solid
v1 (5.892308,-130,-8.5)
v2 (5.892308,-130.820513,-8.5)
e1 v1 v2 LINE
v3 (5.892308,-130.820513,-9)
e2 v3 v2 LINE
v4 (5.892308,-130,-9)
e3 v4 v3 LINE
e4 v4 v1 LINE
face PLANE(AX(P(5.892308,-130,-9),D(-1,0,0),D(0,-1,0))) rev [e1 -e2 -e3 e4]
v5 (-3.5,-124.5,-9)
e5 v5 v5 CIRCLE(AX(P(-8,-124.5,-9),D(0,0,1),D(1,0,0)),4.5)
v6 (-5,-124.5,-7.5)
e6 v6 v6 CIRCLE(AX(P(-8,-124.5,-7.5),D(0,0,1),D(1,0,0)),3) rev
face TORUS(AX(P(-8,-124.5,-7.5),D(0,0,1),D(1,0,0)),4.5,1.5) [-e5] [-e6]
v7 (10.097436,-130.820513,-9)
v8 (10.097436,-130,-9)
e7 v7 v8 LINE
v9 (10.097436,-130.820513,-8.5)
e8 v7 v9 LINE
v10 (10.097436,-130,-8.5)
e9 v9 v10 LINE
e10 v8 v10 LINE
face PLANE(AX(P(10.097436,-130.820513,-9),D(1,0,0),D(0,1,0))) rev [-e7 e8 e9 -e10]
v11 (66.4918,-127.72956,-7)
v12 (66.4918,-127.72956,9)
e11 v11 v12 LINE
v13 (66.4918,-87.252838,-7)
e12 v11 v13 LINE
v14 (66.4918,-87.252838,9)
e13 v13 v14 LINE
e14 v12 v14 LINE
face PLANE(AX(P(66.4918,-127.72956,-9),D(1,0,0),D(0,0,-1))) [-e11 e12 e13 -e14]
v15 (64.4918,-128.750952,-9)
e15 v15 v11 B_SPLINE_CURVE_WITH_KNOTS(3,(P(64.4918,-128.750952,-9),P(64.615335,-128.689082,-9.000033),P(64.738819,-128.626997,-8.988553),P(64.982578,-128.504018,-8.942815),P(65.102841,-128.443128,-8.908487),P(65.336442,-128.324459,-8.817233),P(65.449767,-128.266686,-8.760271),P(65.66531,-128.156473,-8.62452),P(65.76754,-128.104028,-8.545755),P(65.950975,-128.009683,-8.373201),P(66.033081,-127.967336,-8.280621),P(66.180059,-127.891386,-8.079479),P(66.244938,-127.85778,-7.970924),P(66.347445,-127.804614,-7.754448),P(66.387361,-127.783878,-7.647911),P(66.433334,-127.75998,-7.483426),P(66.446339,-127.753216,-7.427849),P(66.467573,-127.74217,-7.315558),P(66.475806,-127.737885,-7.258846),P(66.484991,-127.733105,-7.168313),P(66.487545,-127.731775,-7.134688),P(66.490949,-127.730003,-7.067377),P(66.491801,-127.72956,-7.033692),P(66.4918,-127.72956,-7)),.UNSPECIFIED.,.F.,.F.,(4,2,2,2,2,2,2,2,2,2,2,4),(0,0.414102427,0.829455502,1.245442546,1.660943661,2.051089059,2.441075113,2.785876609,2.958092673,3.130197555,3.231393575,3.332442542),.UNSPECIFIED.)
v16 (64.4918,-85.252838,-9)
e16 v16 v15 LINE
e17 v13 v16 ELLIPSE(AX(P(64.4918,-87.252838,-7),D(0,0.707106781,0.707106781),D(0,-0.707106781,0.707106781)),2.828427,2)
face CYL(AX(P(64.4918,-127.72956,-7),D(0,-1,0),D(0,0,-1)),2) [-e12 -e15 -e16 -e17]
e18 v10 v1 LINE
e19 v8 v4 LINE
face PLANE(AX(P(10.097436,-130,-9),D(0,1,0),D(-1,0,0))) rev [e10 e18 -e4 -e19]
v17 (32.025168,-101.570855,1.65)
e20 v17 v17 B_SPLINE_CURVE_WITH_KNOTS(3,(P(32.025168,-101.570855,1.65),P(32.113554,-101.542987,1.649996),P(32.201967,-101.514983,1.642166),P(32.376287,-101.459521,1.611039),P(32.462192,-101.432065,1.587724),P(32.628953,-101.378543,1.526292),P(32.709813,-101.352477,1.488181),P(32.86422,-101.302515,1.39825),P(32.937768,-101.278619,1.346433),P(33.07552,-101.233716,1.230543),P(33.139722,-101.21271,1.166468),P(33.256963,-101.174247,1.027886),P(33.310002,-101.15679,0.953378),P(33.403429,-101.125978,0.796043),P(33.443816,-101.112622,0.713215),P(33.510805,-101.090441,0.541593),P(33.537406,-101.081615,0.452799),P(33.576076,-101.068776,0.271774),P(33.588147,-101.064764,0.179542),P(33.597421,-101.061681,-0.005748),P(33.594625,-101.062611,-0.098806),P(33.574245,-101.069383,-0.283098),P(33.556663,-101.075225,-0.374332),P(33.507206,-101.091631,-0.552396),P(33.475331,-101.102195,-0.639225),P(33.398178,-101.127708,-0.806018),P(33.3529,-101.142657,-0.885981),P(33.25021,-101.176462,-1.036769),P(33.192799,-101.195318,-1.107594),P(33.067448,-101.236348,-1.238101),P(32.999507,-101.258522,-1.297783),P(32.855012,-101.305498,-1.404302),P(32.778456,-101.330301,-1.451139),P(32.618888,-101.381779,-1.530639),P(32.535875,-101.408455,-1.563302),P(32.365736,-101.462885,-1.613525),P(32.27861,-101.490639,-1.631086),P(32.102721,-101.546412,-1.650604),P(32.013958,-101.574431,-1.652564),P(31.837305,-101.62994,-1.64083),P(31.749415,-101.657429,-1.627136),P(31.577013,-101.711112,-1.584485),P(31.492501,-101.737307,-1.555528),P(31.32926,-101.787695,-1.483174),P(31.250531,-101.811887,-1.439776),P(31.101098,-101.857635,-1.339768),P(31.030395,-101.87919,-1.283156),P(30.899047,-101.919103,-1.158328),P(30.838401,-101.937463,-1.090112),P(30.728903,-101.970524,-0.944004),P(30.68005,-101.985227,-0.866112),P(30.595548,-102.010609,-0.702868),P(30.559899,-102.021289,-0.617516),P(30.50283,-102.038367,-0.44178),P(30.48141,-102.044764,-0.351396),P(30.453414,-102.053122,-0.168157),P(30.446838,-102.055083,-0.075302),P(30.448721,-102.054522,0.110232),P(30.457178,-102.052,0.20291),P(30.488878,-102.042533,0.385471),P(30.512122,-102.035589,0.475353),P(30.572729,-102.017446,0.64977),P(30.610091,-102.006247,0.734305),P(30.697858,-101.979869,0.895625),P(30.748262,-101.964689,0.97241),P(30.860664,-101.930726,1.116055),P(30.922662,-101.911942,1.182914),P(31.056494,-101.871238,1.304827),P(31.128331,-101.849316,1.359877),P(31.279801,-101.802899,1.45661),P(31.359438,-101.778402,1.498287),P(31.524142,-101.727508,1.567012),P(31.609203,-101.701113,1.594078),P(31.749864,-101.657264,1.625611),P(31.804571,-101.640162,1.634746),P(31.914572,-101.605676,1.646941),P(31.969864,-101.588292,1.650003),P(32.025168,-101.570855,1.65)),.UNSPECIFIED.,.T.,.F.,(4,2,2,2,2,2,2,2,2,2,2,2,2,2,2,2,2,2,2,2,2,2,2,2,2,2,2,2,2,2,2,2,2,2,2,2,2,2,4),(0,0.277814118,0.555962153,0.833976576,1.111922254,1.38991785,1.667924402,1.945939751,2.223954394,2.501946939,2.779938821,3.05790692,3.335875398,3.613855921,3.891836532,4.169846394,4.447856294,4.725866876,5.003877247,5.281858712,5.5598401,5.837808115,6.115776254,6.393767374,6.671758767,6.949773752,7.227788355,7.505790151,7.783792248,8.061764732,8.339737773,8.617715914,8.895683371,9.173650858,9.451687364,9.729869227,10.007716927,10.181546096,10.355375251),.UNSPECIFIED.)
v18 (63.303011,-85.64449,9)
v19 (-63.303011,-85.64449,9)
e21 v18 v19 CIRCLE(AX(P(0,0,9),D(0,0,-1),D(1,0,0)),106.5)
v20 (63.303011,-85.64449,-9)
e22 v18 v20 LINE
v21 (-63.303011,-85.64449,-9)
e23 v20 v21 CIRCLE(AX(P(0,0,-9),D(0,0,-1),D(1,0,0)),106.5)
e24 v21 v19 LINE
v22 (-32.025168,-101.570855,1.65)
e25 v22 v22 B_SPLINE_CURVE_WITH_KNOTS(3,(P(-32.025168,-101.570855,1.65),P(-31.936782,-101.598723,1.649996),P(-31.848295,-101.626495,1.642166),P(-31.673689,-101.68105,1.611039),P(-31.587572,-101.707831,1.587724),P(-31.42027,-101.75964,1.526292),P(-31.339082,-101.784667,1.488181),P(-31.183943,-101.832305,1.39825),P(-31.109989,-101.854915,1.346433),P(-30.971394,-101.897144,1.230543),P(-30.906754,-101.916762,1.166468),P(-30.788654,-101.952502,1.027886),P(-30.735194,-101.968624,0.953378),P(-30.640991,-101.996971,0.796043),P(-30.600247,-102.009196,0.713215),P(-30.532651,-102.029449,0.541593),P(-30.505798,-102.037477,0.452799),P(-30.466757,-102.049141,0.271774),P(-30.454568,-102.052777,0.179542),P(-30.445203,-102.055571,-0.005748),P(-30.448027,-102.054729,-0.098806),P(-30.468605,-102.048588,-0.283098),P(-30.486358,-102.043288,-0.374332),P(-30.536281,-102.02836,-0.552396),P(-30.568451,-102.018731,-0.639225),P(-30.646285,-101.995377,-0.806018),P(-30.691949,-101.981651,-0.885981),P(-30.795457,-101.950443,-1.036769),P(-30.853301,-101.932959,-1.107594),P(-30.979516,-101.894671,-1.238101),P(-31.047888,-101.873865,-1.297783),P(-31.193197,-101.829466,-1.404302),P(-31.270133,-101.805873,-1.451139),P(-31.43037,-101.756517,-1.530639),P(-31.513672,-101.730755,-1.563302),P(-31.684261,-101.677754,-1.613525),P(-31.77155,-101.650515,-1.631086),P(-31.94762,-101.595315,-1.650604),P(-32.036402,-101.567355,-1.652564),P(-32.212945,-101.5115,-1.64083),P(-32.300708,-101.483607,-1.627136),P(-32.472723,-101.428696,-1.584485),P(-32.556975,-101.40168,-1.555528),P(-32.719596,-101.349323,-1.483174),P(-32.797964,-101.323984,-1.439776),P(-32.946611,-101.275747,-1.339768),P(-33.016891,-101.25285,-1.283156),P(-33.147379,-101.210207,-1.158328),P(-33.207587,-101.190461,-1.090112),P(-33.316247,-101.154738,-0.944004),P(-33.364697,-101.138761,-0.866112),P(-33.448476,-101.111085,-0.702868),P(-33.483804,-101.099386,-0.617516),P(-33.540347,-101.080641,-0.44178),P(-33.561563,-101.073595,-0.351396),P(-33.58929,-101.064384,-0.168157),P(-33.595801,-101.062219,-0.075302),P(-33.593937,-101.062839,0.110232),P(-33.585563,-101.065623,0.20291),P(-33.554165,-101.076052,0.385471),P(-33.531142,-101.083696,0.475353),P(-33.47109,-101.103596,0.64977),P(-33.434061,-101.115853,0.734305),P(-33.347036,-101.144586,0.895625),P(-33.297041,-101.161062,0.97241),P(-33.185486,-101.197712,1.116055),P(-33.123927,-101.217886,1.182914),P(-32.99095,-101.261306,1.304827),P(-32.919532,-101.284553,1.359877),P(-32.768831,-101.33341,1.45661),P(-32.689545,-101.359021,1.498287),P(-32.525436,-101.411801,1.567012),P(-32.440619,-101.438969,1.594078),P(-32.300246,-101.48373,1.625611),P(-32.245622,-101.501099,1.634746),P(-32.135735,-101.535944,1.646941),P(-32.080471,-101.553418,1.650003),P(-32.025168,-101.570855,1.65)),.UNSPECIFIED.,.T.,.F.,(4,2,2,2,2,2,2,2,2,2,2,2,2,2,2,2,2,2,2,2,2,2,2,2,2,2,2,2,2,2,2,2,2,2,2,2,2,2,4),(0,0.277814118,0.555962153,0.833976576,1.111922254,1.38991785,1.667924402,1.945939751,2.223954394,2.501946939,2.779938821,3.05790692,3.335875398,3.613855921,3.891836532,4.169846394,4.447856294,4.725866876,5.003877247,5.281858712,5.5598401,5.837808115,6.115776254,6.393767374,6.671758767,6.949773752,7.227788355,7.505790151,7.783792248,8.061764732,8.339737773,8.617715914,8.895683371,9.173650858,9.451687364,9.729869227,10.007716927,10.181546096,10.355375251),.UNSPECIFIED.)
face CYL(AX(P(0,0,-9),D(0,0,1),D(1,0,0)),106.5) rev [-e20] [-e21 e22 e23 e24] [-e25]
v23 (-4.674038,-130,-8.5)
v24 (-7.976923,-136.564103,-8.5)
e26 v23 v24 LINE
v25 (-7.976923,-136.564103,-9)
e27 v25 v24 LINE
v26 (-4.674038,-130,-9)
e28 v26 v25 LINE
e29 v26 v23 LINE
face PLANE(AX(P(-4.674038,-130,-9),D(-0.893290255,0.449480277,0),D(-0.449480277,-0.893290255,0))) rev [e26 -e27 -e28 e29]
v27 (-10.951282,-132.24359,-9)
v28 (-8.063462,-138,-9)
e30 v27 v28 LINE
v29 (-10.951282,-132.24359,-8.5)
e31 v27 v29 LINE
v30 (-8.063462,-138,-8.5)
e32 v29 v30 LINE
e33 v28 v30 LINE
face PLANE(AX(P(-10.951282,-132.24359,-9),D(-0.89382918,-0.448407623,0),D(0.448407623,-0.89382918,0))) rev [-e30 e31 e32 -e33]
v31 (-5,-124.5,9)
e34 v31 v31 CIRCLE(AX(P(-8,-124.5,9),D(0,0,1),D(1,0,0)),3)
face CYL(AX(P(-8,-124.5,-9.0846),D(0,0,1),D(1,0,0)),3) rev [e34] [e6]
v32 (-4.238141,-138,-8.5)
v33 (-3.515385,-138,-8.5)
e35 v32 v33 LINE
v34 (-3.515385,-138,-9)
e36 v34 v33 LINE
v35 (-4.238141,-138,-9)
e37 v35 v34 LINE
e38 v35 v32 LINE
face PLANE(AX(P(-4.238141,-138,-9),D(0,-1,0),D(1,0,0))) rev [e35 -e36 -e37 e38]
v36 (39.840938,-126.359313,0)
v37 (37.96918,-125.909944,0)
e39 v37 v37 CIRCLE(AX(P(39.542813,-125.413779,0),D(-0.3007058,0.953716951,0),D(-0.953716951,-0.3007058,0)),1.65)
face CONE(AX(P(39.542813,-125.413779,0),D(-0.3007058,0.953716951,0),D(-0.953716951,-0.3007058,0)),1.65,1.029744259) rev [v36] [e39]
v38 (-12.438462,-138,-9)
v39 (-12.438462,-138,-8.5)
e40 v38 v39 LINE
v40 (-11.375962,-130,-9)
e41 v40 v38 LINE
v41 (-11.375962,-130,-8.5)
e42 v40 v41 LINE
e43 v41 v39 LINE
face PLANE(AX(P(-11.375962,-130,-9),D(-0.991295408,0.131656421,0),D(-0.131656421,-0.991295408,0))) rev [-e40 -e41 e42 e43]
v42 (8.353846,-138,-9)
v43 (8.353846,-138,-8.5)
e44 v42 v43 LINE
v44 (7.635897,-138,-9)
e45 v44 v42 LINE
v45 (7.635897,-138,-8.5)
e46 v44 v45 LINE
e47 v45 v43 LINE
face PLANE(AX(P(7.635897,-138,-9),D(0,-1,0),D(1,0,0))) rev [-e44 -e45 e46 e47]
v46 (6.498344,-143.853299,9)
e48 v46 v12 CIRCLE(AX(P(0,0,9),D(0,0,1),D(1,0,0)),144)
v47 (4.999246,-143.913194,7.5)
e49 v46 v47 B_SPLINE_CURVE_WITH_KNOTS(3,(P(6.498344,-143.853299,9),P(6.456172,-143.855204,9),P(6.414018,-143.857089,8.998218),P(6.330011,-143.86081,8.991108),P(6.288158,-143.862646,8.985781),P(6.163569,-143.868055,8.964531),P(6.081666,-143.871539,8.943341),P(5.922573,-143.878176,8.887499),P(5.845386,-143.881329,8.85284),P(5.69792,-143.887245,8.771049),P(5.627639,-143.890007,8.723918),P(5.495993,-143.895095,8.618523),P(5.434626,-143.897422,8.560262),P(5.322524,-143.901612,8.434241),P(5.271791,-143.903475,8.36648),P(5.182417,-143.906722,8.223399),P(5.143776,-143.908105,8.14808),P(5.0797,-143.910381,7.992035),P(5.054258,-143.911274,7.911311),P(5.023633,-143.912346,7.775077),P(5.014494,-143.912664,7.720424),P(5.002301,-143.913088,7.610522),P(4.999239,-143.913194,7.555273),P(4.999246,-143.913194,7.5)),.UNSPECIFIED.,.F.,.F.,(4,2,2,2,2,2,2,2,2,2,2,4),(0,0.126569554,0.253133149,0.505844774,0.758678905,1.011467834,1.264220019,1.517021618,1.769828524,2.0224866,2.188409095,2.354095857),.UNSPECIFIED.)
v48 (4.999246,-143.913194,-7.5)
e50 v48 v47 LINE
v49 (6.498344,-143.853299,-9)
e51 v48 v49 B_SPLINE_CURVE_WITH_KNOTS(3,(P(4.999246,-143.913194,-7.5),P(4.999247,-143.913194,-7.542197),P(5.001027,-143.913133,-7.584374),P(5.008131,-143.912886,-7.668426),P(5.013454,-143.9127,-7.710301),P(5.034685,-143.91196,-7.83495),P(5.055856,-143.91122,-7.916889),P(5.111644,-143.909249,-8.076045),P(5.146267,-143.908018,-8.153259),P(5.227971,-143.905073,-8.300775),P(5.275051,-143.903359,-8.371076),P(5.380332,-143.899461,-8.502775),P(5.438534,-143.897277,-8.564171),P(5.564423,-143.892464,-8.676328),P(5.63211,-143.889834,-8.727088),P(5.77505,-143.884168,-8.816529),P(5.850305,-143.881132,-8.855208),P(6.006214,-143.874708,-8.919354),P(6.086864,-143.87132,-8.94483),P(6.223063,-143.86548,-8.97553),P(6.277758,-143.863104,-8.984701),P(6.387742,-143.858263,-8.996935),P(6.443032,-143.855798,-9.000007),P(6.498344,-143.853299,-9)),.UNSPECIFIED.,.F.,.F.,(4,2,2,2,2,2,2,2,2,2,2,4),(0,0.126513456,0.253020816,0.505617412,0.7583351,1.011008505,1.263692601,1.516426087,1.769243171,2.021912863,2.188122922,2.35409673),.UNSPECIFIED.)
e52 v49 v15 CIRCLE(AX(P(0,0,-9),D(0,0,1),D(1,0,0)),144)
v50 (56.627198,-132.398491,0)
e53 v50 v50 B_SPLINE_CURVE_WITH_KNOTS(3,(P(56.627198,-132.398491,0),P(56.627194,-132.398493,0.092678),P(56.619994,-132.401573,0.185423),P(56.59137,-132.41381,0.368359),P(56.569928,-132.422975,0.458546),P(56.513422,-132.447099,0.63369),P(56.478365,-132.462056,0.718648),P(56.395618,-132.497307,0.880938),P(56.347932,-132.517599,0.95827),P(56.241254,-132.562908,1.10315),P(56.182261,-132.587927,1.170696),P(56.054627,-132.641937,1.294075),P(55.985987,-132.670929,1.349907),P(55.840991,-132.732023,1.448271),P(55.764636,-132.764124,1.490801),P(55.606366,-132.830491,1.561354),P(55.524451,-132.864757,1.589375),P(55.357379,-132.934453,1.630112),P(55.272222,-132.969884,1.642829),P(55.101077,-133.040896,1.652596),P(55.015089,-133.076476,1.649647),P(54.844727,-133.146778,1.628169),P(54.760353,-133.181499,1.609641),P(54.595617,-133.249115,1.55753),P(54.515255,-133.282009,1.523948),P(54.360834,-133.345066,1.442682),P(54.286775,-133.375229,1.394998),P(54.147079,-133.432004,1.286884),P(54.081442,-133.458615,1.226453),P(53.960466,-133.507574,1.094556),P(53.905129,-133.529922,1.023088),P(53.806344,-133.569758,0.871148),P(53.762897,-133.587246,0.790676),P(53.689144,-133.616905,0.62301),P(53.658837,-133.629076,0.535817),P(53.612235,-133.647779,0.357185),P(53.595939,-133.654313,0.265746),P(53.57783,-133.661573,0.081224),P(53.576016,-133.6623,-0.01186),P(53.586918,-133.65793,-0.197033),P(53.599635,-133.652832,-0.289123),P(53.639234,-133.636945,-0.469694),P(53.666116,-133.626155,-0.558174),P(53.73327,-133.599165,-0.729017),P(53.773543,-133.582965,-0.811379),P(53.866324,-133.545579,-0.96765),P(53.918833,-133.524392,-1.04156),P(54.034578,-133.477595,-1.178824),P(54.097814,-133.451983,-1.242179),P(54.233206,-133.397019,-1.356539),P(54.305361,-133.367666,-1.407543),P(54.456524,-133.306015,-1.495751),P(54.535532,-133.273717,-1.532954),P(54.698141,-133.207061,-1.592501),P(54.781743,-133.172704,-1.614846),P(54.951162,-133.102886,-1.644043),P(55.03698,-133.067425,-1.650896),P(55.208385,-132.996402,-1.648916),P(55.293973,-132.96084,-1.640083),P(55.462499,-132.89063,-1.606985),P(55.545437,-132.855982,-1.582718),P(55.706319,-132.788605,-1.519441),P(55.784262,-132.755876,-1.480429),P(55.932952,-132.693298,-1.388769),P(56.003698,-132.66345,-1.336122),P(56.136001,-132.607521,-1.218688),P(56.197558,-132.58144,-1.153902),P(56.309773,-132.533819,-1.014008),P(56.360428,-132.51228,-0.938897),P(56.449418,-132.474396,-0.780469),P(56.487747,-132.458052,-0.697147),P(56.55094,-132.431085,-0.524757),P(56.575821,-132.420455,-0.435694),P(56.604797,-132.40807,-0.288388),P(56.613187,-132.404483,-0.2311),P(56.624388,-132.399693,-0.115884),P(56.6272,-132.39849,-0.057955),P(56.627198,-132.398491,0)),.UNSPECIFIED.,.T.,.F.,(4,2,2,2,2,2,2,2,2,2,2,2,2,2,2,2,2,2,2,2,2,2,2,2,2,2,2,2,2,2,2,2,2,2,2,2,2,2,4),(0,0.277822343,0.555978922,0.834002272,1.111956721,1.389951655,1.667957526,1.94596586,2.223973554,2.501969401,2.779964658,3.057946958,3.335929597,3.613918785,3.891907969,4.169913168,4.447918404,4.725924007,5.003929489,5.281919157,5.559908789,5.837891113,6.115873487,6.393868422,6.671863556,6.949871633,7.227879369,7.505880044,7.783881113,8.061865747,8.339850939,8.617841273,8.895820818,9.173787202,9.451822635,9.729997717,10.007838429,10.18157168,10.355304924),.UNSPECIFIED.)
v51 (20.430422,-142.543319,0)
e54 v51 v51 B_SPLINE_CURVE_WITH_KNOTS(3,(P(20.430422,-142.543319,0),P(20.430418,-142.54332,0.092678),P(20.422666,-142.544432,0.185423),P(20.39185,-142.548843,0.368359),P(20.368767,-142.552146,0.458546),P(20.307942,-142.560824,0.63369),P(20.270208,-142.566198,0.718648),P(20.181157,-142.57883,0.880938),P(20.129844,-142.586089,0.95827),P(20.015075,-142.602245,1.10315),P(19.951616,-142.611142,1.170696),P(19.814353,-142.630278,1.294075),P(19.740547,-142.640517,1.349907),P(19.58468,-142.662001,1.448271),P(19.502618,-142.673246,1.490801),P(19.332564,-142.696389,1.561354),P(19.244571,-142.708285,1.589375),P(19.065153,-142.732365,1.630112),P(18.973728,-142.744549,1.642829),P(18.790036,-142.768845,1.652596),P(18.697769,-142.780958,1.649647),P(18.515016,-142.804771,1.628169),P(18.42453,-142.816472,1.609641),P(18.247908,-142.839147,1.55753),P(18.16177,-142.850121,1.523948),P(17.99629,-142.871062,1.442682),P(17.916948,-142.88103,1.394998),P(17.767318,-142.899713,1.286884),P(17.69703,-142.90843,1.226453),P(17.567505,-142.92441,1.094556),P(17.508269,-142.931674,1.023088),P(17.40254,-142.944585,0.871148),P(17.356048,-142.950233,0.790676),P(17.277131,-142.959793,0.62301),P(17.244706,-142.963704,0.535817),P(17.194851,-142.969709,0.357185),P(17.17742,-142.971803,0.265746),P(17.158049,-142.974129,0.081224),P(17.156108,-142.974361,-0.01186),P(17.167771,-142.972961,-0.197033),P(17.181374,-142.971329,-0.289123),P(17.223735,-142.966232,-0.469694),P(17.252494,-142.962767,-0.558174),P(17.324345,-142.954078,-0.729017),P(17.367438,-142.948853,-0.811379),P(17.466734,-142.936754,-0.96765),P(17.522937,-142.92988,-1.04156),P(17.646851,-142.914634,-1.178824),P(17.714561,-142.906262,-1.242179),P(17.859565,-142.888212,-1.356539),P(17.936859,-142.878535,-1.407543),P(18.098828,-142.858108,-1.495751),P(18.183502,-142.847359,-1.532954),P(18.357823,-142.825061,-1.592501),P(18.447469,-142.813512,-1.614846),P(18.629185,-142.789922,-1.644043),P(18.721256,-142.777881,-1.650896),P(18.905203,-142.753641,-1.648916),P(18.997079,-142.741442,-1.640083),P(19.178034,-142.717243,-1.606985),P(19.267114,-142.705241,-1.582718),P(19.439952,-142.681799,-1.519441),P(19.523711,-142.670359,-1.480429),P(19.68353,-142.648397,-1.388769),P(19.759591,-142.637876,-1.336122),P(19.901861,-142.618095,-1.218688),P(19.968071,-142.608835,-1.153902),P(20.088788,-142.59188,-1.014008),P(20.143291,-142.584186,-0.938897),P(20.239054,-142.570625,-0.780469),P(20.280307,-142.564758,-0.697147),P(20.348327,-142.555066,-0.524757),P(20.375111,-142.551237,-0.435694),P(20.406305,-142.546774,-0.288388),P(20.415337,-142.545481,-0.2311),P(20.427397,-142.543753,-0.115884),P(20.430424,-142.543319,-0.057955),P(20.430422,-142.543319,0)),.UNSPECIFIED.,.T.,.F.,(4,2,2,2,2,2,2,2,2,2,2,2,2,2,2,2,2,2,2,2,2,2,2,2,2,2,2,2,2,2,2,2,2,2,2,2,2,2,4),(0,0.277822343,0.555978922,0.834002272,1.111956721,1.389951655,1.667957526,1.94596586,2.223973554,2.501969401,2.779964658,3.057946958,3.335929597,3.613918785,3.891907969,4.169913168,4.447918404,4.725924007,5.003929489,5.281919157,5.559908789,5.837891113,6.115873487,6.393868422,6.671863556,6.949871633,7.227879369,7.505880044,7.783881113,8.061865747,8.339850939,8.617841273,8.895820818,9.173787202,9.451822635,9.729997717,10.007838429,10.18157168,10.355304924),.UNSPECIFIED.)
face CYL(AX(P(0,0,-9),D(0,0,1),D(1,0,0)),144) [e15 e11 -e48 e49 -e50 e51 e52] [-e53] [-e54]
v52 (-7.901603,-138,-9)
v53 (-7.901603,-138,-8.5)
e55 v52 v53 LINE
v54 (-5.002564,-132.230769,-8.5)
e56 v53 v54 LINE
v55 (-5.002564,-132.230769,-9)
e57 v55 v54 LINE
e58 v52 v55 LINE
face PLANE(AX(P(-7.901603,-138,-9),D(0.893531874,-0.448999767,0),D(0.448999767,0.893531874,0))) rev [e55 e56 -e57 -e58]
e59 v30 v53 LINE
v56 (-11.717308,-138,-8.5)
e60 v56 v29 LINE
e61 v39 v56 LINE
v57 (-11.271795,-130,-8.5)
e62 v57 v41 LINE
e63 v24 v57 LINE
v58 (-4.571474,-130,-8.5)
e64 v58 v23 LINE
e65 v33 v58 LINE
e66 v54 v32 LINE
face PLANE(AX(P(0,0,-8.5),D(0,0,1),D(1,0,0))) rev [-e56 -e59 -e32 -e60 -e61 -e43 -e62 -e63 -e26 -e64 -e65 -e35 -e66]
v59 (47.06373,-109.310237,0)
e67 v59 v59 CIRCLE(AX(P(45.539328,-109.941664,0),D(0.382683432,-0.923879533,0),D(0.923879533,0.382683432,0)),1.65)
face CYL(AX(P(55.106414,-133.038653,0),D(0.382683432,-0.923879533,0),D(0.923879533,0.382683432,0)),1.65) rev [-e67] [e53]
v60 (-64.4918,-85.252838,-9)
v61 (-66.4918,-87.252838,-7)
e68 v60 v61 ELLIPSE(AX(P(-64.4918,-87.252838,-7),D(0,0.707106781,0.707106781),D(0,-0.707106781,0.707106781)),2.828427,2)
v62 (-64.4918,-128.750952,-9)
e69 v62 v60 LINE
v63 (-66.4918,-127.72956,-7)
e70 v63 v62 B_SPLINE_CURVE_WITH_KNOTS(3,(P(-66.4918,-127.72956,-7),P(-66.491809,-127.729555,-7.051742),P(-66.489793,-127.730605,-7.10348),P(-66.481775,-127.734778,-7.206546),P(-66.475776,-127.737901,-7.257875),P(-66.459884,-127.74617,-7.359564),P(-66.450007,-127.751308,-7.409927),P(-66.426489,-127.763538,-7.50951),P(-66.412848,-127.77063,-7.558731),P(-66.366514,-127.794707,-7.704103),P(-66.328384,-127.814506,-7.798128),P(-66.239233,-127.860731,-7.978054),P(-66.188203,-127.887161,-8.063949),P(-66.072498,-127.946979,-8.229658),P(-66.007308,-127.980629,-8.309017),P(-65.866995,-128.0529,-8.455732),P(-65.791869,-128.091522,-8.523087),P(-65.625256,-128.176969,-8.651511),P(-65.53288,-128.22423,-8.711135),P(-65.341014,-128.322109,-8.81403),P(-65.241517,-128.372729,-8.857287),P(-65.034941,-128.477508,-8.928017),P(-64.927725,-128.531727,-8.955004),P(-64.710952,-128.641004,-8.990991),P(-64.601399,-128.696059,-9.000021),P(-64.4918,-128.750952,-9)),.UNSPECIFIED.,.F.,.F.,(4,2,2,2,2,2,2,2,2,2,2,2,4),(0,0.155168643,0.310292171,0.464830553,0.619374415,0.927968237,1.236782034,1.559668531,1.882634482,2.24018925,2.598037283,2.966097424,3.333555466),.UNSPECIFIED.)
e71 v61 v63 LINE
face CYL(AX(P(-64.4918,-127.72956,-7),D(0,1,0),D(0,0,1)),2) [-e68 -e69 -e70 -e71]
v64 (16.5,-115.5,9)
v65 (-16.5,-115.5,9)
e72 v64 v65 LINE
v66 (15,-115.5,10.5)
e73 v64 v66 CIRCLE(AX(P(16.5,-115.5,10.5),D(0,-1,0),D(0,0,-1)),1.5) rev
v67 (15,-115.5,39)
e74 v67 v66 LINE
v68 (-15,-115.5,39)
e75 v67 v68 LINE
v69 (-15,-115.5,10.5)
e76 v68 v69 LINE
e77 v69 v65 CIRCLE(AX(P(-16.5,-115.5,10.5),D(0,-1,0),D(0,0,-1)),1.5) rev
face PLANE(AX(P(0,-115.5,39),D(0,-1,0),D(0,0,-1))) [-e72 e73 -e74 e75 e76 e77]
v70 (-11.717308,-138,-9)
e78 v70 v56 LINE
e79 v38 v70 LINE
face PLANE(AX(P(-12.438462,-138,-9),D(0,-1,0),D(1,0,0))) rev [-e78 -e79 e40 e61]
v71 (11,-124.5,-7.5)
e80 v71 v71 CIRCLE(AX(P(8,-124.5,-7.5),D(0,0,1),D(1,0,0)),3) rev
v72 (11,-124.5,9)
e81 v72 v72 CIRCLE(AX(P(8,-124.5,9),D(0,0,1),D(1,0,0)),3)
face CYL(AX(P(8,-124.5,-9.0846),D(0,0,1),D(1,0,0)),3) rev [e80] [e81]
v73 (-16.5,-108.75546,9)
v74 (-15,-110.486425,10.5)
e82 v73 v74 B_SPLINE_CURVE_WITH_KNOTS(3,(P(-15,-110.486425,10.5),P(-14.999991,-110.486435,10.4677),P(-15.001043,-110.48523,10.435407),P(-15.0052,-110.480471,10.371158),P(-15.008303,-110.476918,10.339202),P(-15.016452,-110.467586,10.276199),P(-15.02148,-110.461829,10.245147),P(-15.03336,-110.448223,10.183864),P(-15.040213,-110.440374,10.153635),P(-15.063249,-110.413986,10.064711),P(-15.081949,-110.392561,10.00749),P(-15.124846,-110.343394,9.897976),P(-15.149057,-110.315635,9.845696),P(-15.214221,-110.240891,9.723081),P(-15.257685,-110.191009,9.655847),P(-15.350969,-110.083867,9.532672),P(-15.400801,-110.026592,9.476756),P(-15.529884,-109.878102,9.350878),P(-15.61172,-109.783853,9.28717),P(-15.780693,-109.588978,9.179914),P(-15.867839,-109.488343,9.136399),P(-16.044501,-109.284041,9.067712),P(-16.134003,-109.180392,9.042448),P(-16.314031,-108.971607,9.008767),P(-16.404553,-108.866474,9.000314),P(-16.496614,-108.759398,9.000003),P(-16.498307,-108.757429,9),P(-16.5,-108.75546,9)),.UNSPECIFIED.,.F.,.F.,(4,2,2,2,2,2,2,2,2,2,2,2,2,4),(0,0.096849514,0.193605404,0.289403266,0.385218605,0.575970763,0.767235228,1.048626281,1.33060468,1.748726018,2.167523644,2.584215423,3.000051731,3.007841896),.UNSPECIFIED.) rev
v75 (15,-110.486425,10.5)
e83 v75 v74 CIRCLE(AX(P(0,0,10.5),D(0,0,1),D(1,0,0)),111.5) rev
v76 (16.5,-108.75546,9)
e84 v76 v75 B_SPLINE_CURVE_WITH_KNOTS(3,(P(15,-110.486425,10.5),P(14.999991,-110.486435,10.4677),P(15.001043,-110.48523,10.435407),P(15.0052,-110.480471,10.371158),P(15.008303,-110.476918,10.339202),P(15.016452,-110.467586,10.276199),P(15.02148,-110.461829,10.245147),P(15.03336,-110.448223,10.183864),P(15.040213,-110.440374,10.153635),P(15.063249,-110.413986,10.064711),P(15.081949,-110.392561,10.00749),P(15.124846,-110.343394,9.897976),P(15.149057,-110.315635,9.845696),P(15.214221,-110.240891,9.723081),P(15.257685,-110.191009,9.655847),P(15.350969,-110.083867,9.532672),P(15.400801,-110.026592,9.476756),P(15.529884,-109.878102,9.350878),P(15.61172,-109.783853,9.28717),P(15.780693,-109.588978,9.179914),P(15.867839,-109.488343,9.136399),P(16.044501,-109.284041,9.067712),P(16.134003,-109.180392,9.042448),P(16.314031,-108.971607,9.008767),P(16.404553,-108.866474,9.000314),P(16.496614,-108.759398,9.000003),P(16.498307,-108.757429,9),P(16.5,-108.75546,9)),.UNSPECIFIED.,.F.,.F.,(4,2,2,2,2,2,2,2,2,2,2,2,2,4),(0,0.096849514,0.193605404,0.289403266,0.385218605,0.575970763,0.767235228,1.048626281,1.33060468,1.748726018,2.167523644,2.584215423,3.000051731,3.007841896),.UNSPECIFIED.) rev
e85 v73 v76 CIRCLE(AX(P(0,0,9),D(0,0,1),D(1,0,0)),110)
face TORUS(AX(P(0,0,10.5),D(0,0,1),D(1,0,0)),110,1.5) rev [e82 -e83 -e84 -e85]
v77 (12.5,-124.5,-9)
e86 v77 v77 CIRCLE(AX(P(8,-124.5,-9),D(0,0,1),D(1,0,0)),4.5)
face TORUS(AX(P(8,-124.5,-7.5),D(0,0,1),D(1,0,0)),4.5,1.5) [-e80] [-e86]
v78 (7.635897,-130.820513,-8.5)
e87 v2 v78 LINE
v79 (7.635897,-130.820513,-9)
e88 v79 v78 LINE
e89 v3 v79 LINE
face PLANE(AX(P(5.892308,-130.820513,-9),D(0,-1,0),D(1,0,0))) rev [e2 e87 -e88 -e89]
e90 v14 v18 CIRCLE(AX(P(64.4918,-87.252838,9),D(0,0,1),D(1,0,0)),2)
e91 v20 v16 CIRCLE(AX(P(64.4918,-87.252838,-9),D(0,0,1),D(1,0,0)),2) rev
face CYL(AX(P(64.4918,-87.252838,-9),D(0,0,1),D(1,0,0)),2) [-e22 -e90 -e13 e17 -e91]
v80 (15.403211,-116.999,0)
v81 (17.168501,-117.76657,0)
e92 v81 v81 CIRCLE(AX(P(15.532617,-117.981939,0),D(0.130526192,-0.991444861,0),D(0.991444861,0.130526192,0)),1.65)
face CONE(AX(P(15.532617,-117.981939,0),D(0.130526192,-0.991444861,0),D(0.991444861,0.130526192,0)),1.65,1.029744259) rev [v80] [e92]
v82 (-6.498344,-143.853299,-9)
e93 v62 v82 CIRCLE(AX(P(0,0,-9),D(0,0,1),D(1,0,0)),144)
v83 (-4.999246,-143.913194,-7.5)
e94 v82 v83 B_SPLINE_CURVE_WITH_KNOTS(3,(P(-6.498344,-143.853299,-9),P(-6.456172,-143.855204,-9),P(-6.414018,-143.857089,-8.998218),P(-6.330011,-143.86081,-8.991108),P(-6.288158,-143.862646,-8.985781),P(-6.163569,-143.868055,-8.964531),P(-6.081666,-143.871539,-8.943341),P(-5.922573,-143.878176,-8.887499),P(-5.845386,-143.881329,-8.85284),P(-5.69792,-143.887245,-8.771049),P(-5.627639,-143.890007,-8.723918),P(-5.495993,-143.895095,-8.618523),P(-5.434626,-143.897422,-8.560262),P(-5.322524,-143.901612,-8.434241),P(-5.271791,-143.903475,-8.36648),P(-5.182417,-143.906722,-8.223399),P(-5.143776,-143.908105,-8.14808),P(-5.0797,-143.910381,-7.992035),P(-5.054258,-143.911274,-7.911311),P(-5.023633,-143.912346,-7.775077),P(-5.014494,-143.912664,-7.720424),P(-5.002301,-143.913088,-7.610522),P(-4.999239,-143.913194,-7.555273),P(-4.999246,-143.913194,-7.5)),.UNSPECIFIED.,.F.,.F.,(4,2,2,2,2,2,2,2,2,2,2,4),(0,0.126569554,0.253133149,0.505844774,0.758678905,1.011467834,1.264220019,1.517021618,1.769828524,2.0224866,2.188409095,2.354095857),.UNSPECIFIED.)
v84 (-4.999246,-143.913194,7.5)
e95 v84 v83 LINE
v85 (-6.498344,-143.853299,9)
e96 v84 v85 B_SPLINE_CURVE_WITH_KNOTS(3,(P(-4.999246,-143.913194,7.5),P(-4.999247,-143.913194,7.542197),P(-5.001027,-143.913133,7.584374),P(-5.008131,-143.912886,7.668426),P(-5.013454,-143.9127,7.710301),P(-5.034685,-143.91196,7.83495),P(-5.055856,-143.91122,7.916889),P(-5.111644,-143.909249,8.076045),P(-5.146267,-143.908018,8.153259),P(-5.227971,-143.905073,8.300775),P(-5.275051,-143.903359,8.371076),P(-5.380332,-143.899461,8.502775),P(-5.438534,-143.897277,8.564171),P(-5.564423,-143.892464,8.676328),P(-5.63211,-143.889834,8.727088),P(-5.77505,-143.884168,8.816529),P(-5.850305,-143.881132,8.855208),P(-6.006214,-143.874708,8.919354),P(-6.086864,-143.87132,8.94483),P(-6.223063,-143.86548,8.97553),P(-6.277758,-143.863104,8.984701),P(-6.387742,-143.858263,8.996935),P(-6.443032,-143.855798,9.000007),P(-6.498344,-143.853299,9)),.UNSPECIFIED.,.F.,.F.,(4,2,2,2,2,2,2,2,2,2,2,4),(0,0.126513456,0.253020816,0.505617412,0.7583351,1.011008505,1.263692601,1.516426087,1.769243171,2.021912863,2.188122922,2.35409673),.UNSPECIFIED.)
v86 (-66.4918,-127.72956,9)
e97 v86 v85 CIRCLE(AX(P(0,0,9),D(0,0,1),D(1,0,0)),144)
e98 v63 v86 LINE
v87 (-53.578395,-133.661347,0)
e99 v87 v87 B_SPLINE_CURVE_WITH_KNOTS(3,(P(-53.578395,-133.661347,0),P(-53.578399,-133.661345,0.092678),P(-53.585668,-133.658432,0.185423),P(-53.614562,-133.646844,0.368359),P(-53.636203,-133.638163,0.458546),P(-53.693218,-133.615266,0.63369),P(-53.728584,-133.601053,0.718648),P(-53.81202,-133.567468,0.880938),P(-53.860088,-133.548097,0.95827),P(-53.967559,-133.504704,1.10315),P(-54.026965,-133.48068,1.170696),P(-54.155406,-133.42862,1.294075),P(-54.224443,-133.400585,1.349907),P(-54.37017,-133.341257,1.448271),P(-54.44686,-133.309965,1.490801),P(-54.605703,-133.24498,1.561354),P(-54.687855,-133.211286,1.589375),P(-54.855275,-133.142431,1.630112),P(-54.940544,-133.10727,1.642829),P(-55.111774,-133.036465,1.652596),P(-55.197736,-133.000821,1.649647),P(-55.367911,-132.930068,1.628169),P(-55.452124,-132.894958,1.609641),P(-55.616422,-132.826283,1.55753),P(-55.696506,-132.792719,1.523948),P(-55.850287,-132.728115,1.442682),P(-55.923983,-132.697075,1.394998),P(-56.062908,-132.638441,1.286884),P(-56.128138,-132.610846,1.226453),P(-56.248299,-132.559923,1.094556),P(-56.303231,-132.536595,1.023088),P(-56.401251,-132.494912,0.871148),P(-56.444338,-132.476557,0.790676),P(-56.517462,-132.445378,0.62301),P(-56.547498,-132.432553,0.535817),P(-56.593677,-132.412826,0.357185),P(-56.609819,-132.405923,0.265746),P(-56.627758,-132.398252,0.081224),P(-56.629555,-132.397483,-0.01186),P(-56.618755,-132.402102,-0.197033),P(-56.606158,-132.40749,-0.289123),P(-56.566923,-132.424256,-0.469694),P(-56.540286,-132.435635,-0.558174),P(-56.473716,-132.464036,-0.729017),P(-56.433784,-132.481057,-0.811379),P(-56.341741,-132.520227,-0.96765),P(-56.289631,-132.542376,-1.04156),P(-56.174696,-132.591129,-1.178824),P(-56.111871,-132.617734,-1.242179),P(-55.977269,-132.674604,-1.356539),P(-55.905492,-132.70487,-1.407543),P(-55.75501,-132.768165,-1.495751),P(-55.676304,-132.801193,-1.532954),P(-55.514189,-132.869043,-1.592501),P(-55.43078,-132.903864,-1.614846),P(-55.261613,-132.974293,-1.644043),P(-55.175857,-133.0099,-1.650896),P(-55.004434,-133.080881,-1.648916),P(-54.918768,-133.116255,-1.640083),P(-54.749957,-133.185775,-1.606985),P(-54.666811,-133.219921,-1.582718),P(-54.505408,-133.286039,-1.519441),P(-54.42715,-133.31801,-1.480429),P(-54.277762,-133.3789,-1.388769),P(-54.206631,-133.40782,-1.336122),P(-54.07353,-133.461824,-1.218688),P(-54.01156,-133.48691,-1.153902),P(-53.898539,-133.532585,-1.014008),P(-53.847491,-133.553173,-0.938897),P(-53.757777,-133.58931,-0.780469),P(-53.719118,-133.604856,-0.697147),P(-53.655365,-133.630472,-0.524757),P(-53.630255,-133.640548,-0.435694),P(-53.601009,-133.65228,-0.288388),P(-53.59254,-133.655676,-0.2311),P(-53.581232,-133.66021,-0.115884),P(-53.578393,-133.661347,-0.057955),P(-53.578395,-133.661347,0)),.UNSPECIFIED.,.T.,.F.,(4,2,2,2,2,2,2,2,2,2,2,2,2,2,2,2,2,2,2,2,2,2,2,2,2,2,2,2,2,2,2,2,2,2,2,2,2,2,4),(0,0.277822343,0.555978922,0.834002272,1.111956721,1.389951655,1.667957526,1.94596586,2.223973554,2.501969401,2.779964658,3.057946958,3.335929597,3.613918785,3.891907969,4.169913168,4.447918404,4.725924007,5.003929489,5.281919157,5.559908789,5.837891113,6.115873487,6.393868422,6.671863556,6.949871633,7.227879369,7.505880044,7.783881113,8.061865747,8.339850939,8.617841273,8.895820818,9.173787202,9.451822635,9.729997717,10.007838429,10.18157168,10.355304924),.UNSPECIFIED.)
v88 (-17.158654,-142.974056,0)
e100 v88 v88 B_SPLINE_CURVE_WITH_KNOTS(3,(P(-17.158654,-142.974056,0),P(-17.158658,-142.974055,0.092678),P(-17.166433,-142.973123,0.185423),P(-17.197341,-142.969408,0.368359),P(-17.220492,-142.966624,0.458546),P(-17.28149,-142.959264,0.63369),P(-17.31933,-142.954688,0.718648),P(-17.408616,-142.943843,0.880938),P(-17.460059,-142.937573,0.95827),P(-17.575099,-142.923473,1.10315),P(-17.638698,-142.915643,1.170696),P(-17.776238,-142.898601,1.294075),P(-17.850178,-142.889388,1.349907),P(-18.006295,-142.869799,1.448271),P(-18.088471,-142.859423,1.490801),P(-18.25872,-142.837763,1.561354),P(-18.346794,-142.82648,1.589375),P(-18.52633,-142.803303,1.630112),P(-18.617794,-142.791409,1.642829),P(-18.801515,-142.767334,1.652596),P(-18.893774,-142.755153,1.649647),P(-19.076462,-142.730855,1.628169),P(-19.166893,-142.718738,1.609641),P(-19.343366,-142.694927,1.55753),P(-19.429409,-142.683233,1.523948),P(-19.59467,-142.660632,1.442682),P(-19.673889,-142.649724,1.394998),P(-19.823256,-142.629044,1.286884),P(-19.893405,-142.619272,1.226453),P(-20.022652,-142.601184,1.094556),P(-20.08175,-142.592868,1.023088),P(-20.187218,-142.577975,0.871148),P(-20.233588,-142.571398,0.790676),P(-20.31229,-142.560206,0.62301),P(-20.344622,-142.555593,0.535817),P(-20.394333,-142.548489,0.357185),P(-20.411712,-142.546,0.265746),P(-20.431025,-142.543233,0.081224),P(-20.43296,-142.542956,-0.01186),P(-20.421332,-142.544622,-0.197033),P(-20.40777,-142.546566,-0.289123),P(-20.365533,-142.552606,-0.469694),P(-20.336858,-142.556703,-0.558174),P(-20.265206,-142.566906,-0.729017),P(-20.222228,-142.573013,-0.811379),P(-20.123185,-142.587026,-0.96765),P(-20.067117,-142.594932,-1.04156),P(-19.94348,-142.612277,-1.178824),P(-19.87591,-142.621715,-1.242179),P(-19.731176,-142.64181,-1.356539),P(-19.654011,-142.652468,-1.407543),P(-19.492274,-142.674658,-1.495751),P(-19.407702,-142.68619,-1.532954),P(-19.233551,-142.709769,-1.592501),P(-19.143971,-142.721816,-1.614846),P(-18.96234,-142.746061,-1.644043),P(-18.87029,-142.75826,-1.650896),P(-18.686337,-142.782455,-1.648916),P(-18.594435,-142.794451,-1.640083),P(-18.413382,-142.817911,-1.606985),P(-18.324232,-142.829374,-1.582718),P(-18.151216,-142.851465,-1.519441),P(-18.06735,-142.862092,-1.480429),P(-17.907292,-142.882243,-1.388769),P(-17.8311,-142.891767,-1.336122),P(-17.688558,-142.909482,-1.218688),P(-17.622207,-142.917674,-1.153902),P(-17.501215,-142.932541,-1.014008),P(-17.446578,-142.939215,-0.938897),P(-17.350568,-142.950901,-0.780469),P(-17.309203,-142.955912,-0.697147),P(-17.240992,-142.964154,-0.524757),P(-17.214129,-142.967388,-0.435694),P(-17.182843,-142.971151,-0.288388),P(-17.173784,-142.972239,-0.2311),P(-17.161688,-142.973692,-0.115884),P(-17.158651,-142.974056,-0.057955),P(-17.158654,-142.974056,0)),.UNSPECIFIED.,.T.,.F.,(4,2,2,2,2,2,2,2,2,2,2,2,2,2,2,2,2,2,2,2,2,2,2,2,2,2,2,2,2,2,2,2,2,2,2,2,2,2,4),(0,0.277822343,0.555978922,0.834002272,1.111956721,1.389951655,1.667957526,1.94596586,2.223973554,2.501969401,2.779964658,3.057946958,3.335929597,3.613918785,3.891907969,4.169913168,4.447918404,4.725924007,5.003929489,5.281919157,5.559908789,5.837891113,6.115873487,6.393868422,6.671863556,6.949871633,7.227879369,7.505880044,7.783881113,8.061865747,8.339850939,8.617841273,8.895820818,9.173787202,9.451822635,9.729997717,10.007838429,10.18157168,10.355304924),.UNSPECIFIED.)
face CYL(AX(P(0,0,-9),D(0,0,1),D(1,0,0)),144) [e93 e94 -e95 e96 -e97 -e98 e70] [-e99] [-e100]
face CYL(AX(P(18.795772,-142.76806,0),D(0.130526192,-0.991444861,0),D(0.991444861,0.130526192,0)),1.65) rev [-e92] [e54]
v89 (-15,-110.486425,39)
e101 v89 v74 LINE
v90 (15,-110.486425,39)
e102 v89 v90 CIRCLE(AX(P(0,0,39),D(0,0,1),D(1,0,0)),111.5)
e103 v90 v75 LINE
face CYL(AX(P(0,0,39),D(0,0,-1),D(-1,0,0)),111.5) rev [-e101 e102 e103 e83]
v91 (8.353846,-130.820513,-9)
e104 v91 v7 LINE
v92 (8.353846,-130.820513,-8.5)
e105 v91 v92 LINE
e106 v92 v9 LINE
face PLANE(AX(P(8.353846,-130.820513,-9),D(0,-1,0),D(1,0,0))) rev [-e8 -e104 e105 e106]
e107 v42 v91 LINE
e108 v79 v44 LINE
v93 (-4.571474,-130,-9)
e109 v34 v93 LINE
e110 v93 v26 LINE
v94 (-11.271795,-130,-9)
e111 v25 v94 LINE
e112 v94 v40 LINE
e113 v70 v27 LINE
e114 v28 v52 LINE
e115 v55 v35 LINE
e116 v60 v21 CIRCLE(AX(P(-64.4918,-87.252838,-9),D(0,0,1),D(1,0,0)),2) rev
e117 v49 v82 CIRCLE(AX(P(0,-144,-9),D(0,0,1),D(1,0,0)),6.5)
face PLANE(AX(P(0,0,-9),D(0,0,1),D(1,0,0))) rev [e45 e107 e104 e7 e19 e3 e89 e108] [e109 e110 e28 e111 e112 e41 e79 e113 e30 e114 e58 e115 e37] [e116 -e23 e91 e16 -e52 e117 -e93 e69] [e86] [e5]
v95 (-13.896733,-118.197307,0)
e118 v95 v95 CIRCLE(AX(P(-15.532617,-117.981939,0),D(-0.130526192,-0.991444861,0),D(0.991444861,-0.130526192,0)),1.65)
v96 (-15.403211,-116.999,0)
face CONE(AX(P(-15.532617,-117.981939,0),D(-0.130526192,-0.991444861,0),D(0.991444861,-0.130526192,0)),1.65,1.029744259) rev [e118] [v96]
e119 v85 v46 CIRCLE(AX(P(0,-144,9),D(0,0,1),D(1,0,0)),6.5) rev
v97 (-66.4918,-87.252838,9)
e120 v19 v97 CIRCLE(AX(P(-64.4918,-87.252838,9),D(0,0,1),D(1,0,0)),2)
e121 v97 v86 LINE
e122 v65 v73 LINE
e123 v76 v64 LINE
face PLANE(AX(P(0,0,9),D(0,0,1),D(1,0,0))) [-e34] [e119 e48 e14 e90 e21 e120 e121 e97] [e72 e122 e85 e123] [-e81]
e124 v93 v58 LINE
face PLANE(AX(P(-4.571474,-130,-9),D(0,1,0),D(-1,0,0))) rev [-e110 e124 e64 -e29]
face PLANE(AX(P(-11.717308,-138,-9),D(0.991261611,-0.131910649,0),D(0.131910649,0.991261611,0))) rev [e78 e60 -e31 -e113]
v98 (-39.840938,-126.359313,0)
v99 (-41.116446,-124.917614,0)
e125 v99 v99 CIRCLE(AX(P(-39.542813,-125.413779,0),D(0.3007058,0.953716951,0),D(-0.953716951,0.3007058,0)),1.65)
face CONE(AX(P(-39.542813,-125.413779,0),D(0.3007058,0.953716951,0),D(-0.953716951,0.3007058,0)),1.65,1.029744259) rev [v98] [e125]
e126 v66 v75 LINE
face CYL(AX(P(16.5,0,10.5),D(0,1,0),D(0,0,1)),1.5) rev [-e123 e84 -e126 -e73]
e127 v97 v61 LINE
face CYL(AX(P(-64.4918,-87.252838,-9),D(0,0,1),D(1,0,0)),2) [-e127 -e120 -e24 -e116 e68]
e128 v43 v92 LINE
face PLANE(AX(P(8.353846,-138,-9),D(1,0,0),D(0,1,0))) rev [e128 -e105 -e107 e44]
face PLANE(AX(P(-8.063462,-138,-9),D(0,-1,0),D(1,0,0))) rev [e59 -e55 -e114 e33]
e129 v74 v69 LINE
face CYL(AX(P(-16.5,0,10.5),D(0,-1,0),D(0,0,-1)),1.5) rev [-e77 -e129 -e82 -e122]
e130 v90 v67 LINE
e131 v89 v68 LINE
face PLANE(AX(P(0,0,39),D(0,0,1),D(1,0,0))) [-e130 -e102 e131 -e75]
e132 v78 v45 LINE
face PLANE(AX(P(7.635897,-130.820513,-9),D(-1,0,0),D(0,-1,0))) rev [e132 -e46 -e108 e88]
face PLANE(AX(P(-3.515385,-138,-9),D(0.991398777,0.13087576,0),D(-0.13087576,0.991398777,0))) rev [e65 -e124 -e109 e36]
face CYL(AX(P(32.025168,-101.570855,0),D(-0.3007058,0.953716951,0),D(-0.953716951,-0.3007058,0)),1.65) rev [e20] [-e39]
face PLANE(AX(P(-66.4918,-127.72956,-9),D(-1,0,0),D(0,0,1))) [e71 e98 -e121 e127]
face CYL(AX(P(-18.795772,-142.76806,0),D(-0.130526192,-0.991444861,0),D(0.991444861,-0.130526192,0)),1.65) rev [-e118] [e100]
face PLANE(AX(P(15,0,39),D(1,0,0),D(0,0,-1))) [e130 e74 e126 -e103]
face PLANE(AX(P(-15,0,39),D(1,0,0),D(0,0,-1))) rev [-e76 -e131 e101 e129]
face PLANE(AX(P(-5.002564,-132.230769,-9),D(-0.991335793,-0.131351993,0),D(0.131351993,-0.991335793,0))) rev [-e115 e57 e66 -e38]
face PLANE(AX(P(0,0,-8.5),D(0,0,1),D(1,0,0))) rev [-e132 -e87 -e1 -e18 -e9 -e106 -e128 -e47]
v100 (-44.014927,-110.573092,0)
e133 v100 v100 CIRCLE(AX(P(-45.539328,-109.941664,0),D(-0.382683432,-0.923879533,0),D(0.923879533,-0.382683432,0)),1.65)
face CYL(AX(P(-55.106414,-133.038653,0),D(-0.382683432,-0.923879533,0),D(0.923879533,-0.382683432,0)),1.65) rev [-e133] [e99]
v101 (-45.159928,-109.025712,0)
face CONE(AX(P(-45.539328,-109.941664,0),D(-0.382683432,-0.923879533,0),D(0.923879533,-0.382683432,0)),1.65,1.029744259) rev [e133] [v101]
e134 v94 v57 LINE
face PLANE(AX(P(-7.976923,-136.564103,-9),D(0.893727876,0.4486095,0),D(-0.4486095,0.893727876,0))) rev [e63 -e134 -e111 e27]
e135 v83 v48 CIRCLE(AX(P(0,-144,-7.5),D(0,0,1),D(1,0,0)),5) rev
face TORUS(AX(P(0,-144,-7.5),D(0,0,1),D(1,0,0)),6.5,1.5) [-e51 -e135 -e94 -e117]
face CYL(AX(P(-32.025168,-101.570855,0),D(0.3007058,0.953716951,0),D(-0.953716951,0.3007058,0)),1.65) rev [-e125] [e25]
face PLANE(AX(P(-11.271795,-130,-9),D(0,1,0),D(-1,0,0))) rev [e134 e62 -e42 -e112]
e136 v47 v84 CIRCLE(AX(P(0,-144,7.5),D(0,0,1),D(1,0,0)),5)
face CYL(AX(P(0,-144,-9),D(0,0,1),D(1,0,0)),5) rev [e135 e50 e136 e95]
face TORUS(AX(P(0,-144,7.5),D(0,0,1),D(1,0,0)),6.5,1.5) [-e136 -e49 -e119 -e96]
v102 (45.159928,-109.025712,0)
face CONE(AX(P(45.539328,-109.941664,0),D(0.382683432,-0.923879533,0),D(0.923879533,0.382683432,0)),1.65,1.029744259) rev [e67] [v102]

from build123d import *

# Parameters (mm, degrees)
BOSS_EXTRUDE1_DEPTH                   = 9
BOSS_EXTRUDE1_DEPTH_BACK              = 9
TAP_DRILL_FOR_M4_TAP1_D               = 3.3
TAP_DRILL_FOR_M4_TAP1_DEPTH           = 25
TAP_DRILL_FOR_M4_TAP1_TIP             = 0.991420021
TAP_DRILL_FOR_M4_TAP1_ON_FACE_2_D     = 3.3
TAP_DRILL_FOR_M4_TAP1_ON_FACE_2_DEPTH = 25
TAP_DRILL_FOR_M4_TAP1_ON_FACE_2_TIP   = 0.991420021
TAP_DRILL_FOR_M4_TAP1_ON_FACE_3_D     = 3.3
TAP_DRILL_FOR_M4_TAP1_ON_FACE_3_DEPTH = 25
TAP_DRILL_FOR_M4_TAP1_ON_FACE_3_TIP   = 0.991420021
TAP_DRILL_FOR_M4_TAP1_ON_FACE_4_D     = 3.3
TAP_DRILL_FOR_M4_TAP1_ON_FACE_4_DEPTH = 25
TAP_DRILL_FOR_M4_TAP1_ON_FACE_4_TIP   = 0.991420021
TAP_DRILL_FOR_M4_TAP1_ON_FACE_5_D     = 3.3
TAP_DRILL_FOR_M4_TAP1_ON_FACE_5_DEPTH = 25
TAP_DRILL_FOR_M4_TAP1_ON_FACE_5_TIP   = 0.991420021
TAP_DRILL_FOR_M4_TAP1_ON_FACE_6_D     = 3.3
TAP_DRILL_FOR_M4_TAP1_ON_FACE_6_DEPTH = 25
TAP_DRILL_FOR_M4_TAP1_ON_FACE_6_TIP   = 0.991420021
FILLET2_R                             = 2
CUT_EXTRUDE2_DEPTH                    = 159.865224489
CUT_EXTRUDE2_DEPTH_BACK               = 159.865224489
SKETCH3_R                             = 5
FILLET3_R                             = 1.5
BOSS_EXTRUDE2_START                   = 9
BOSS_EXTRUDE2_DEPTH                   = 30
FILLET4_R                             = 1.5
FILLET5_R                             = 2
CUT_EXTRUDE3_DEPTH                    = 164.257977095
CUT_EXTRUDE3_DEPTH_BACK               = 164.257977095
SKETCH4_3_R                           = 3
FILLET6_R                             = 1.5
WRAP1_START                           = -0.5
WRAP1_DEPTH                           = 0.5


# Read off the part's stored shape, not the designer's step: Wrap1
with BuildPart() as part:
    # Sketch1 → Boss-Extrude1 (new, two sides: drawn at the far end of the back side and taken through both)
    with BuildSketch(Plane.XY.offset(-BOSS_EXTRUDE1_DEPTH_BACK)):
        with BuildLine():
            Line((66.491800306, -127.729559978), (66.491800306, -83.193091613))
            ThreePointArc((66.491800306, -83.193091613), (0, -106.5), (-66.491800306, -83.193091613))
            Line((-66.491800306, -83.193091613), (-66.491800306, -127.729559978))
            ThreePointArc((-66.491800306, -127.729559978), (0, -144), (66.491800306, -127.729559978))
        make_face()
    extrude(amount=BOSS_EXTRUDE1_DEPTH + BOSS_EXTRUDE1_DEPTH_BACK)

    # Tap Drill for M4 Tap1
    with Locations(Plane(origin=(-32.025167647, -101.570855255, 0), x_dir=(0.953716950748, -0.300705799504, 0), z_dir=(0.300705799504, 0.953716950748, 0))):
        with Locations((0, 0)):
            Hole(TAP_DRILL_FOR_M4_TAP1_D / 2, depth=TAP_DRILL_FOR_M4_TAP1_DEPTH)
            with Locations((0, 0, -(TAP_DRILL_FOR_M4_TAP1_DEPTH + TAP_DRILL_FOR_M4_TAP1_TIP / 2))):  # 118° drill point
                Cone(0, TAP_DRILL_FOR_M4_TAP1_D / 2, TAP_DRILL_FOR_M4_TAP1_TIP, mode=Mode.SUBTRACT)

    # Tap Drill for M4 Tap1 on face 2
    with Locations(Plane(origin=(32.025167647, -101.570855255, 0), x_dir=(0.953716897702, 0.300705967746, 0), z_dir=(-0.300705967746, 0.953716897702, 0))):
        with Locations((0, 0)):
            Hole(TAP_DRILL_FOR_M4_TAP1_ON_FACE_2_D / 2, depth=TAP_DRILL_FOR_M4_TAP1_ON_FACE_2_DEPTH)
            with Locations((0, 0, -(TAP_DRILL_FOR_M4_TAP1_ON_FACE_2_DEPTH + TAP_DRILL_FOR_M4_TAP1_ON_FACE_2_TIP / 2))):  # 118° drill point
                Cone(0, TAP_DRILL_FOR_M4_TAP1_ON_FACE_2_D / 2, TAP_DRILL_FOR_M4_TAP1_ON_FACE_2_TIP, mode=Mode.SUBTRACT)

    # Tap Drill for M4 Tap1 on face 3
    with Locations(Plane(origin=(-55.106414261, -133.038652682, 0), x_dir=(-0.923879753837, 0.382682898036, 0), z_dir=(-0.382682898036, -0.923879753837, 0))):
        with Locations((0, 0)):
            Hole(TAP_DRILL_FOR_M4_TAP1_ON_FACE_3_D / 2, depth=TAP_DRILL_FOR_M4_TAP1_ON_FACE_3_DEPTH)
            with Locations((0, 0, -(TAP_DRILL_FOR_M4_TAP1_ON_FACE_3_DEPTH + TAP_DRILL_FOR_M4_TAP1_ON_FACE_3_TIP / 2))):  # 118° drill point
                Cone(0, TAP_DRILL_FOR_M4_TAP1_ON_FACE_3_D / 2, TAP_DRILL_FOR_M4_TAP1_ON_FACE_3_TIP, mode=Mode.SUBTRACT)

    # Tap Drill for M4 Tap1 on face 4
    with Locations(Plane(origin=(18.79577168, -142.768060038, 0), x_dir=(-0.991444888611, -0.130525985335, 0), z_dir=(0.130525985335, -0.991444888611, 0))):
        with Locations((0, 0)):
            Hole(TAP_DRILL_FOR_M4_TAP1_ON_FACE_4_D / 2, depth=TAP_DRILL_FOR_M4_TAP1_ON_FACE_4_DEPTH)
            with Locations((0, 0, -(TAP_DRILL_FOR_M4_TAP1_ON_FACE_4_DEPTH + TAP_DRILL_FOR_M4_TAP1_ON_FACE_4_TIP / 2))):  # 118° drill point
                Cone(0, TAP_DRILL_FOR_M4_TAP1_ON_FACE_4_D / 2, TAP_DRILL_FOR_M4_TAP1_ON_FACE_4_TIP, mode=Mode.SUBTRACT)

    # Tap Drill for M4 Tap1 on face 5
    with Locations(Plane(origin=(55.106414261, -133.038652682, 0), x_dir=(-0.923879753837, -0.382682898036, 0), z_dir=(0.382682898036, -0.923879753837, 0))):
        with Locations((0, 0)):
            Hole(TAP_DRILL_FOR_M4_TAP1_ON_FACE_5_D / 2, depth=TAP_DRILL_FOR_M4_TAP1_ON_FACE_5_DEPTH)
            with Locations((0, 0, -(TAP_DRILL_FOR_M4_TAP1_ON_FACE_5_DEPTH + TAP_DRILL_FOR_M4_TAP1_ON_FACE_5_TIP / 2))):  # 118° drill point
                Cone(0, TAP_DRILL_FOR_M4_TAP1_ON_FACE_5_D / 2, TAP_DRILL_FOR_M4_TAP1_ON_FACE_5_TIP, mode=Mode.SUBTRACT)

    # Tap Drill for M4 Tap1 on face 6
    with Locations(Plane(origin=(-18.79577168, -142.768060038, 0), x_dir=(-0.991444888611, 0.130525985335, 0), z_dir=(-0.130525985335, -0.991444888611, 0))):
        with Locations((0, 0)):
            Hole(TAP_DRILL_FOR_M4_TAP1_ON_FACE_6_D / 2, depth=TAP_DRILL_FOR_M4_TAP1_ON_FACE_6_DEPTH)
            with Locations((0, 0, -(TAP_DRILL_FOR_M4_TAP1_ON_FACE_6_DEPTH + TAP_DRILL_FOR_M4_TAP1_ON_FACE_6_TIP / 2))):  # 118° drill point
                Cone(0, TAP_DRILL_FOR_M4_TAP1_ON_FACE_6_D / 2, TAP_DRILL_FOR_M4_TAP1_ON_FACE_6_TIP, mode=Mode.SUBTRACT)

    # Fillet2
    fillet2_edges = [part.edges().sort_by_distance(p)[0] for p in [
        (66.491800306, -83.193091613, 0),
        (-66.491800306, -83.193091613, 0),
    ]]
    fillet(fillet2_edges, radius=FILLET2_R)

    # Sketch3 → Cut-Extrude2 (cut, two sides: drawn at the far end of the back side and taken through both)
    with BuildSketch(Plane.XY.offset(-CUT_EXTRUDE2_DEPTH_BACK)):
        with Locations((0, -144)):
            Circle(SKETCH3_R)
    extrude(amount=CUT_EXTRUDE2_DEPTH + CUT_EXTRUDE2_DEPTH_BACK, mode=Mode.SUBTRACT)

    # Fillet3
    fillet3_edges = [part.edges().sort_by_distance(p)[0] for p in [
        (0, -139, -9),
        (0, -139, 9),
    ]]
    fillet(fillet3_edges, radius=FILLET3_R)

    # Sketch4 → Boss-Extrude2 (add)
    with BuildSketch(Plane.XY.offset(BOSS_EXTRUDE2_START)):
        with BuildLine():
            Line((0, -115.5), (0, -111.5))
            ThreePointArc((0, -111.5), (-7.517102754, -111.24631754), (-15, -110.486424505))
            Line((-15, -110.486424505), (-15, -115.5))
            Line((-15, -115.5), (0, -115.5))
        make_face()
        with BuildLine():
            ThreePointArc((15, -110.486424505), (7.517102754, -111.24631754), (0, -111.5))
            Line((0, -111.5), (0, -115.5))
            Line((0, -115.5), (15, -115.5))
            Line((15, -115.5), (15, -110.486424505))
        make_face()
    extrude(amount=BOSS_EXTRUDE2_DEPTH)

    # Fillet4
    fillet4_edges = [part.edges().sort_by_distance(p)[0] for p in [
        (-15, -112.993212253, 9),
        (0, -111.5, 9),
        (15, -112.993212253, 9),
    ]]
    fillet(fillet4_edges, radius=FILLET4_R)

    # Fillet5
    # the kernel refuses this fillet: 2 mm, written as the material it takes off along each edge
    with BuildSketch(Plane(origin=(66.491800306, -132.729559978, -9), x_dir=(-1, 0, 0), z_dir=(0, 1, 0)), Plane(origin=(-66.491800306, -82.252837738, -9), x_dir=(1, 0, 0), z_dir=(0, -1, 0))) as fillet5_piece_1:
        with BuildLine():
            CenterArc((FILLET5_R, FILLET5_R), FILLET5_R, 180, 90)
            Line((0, FILLET5_R), (0, 0))
            Line((0, 0), (FILLET5_R, 0))
        make_face()
    extrude(amount=50.47672224, mode=Mode.SUBTRACT)

    # Sketch4<3> → Cut-Extrude3 (cut, two sides: drawn at the far end of the back side and taken through both)
    with BuildSketch(Plane.XY.offset(-CUT_EXTRUDE3_DEPTH_BACK)):
        with Locations((-8, -124.5)):
            Circle(SKETCH4_3_R)
        with Locations((8, -124.5)):
            Circle(SKETCH4_3_R)
    extrude(amount=CUT_EXTRUDE3_DEPTH + CUT_EXTRUDE3_DEPTH_BACK, mode=Mode.SUBTRACT)

    # Fillet6
    fillet6_edges = [part.edges().sort_by_distance(p)[0] for p in [
        (-11, -124.5, -9),
        (5, -124.5, -9),
    ]]
    fillet(fillet6_edges, radius=FILLET6_R)

    # Wrap1 outline → Wrap1 (cut)
    with BuildSketch(Plane(origin=(0, 0, -9), x_dir=(-1, 0, 0), z_dir=(0, 0, -1)).offset(WRAP1_START)):
        Polygon((-5.892307692, -130.820512821), (-5.892307692, -130), (-10.097435897, -130), (-10.097435897, -130.820512821), (-8.353846154, -130.820512821), (-8.353846154, -138), (-7.635897436, -138), (-7.635897436, -130.820512821), align=None)
        Polygon((7.976923077, -136.564102564), (4.674038462, -130), (4.571474359, -130), (3.515384615, -138), (4.238141026, -138), (5.002564103, -132.230769231), (7.901602564, -138), (8.063461538, -138), (10.951282051, -132.243589744), (11.717307692, -138), (12.438461538, -138), (11.375961538, -130), (11.271794872, -130), align=None)
    extrude(amount=WRAP1_DEPTH, mode=Mode.SUBTRACT)


solid = part.part
